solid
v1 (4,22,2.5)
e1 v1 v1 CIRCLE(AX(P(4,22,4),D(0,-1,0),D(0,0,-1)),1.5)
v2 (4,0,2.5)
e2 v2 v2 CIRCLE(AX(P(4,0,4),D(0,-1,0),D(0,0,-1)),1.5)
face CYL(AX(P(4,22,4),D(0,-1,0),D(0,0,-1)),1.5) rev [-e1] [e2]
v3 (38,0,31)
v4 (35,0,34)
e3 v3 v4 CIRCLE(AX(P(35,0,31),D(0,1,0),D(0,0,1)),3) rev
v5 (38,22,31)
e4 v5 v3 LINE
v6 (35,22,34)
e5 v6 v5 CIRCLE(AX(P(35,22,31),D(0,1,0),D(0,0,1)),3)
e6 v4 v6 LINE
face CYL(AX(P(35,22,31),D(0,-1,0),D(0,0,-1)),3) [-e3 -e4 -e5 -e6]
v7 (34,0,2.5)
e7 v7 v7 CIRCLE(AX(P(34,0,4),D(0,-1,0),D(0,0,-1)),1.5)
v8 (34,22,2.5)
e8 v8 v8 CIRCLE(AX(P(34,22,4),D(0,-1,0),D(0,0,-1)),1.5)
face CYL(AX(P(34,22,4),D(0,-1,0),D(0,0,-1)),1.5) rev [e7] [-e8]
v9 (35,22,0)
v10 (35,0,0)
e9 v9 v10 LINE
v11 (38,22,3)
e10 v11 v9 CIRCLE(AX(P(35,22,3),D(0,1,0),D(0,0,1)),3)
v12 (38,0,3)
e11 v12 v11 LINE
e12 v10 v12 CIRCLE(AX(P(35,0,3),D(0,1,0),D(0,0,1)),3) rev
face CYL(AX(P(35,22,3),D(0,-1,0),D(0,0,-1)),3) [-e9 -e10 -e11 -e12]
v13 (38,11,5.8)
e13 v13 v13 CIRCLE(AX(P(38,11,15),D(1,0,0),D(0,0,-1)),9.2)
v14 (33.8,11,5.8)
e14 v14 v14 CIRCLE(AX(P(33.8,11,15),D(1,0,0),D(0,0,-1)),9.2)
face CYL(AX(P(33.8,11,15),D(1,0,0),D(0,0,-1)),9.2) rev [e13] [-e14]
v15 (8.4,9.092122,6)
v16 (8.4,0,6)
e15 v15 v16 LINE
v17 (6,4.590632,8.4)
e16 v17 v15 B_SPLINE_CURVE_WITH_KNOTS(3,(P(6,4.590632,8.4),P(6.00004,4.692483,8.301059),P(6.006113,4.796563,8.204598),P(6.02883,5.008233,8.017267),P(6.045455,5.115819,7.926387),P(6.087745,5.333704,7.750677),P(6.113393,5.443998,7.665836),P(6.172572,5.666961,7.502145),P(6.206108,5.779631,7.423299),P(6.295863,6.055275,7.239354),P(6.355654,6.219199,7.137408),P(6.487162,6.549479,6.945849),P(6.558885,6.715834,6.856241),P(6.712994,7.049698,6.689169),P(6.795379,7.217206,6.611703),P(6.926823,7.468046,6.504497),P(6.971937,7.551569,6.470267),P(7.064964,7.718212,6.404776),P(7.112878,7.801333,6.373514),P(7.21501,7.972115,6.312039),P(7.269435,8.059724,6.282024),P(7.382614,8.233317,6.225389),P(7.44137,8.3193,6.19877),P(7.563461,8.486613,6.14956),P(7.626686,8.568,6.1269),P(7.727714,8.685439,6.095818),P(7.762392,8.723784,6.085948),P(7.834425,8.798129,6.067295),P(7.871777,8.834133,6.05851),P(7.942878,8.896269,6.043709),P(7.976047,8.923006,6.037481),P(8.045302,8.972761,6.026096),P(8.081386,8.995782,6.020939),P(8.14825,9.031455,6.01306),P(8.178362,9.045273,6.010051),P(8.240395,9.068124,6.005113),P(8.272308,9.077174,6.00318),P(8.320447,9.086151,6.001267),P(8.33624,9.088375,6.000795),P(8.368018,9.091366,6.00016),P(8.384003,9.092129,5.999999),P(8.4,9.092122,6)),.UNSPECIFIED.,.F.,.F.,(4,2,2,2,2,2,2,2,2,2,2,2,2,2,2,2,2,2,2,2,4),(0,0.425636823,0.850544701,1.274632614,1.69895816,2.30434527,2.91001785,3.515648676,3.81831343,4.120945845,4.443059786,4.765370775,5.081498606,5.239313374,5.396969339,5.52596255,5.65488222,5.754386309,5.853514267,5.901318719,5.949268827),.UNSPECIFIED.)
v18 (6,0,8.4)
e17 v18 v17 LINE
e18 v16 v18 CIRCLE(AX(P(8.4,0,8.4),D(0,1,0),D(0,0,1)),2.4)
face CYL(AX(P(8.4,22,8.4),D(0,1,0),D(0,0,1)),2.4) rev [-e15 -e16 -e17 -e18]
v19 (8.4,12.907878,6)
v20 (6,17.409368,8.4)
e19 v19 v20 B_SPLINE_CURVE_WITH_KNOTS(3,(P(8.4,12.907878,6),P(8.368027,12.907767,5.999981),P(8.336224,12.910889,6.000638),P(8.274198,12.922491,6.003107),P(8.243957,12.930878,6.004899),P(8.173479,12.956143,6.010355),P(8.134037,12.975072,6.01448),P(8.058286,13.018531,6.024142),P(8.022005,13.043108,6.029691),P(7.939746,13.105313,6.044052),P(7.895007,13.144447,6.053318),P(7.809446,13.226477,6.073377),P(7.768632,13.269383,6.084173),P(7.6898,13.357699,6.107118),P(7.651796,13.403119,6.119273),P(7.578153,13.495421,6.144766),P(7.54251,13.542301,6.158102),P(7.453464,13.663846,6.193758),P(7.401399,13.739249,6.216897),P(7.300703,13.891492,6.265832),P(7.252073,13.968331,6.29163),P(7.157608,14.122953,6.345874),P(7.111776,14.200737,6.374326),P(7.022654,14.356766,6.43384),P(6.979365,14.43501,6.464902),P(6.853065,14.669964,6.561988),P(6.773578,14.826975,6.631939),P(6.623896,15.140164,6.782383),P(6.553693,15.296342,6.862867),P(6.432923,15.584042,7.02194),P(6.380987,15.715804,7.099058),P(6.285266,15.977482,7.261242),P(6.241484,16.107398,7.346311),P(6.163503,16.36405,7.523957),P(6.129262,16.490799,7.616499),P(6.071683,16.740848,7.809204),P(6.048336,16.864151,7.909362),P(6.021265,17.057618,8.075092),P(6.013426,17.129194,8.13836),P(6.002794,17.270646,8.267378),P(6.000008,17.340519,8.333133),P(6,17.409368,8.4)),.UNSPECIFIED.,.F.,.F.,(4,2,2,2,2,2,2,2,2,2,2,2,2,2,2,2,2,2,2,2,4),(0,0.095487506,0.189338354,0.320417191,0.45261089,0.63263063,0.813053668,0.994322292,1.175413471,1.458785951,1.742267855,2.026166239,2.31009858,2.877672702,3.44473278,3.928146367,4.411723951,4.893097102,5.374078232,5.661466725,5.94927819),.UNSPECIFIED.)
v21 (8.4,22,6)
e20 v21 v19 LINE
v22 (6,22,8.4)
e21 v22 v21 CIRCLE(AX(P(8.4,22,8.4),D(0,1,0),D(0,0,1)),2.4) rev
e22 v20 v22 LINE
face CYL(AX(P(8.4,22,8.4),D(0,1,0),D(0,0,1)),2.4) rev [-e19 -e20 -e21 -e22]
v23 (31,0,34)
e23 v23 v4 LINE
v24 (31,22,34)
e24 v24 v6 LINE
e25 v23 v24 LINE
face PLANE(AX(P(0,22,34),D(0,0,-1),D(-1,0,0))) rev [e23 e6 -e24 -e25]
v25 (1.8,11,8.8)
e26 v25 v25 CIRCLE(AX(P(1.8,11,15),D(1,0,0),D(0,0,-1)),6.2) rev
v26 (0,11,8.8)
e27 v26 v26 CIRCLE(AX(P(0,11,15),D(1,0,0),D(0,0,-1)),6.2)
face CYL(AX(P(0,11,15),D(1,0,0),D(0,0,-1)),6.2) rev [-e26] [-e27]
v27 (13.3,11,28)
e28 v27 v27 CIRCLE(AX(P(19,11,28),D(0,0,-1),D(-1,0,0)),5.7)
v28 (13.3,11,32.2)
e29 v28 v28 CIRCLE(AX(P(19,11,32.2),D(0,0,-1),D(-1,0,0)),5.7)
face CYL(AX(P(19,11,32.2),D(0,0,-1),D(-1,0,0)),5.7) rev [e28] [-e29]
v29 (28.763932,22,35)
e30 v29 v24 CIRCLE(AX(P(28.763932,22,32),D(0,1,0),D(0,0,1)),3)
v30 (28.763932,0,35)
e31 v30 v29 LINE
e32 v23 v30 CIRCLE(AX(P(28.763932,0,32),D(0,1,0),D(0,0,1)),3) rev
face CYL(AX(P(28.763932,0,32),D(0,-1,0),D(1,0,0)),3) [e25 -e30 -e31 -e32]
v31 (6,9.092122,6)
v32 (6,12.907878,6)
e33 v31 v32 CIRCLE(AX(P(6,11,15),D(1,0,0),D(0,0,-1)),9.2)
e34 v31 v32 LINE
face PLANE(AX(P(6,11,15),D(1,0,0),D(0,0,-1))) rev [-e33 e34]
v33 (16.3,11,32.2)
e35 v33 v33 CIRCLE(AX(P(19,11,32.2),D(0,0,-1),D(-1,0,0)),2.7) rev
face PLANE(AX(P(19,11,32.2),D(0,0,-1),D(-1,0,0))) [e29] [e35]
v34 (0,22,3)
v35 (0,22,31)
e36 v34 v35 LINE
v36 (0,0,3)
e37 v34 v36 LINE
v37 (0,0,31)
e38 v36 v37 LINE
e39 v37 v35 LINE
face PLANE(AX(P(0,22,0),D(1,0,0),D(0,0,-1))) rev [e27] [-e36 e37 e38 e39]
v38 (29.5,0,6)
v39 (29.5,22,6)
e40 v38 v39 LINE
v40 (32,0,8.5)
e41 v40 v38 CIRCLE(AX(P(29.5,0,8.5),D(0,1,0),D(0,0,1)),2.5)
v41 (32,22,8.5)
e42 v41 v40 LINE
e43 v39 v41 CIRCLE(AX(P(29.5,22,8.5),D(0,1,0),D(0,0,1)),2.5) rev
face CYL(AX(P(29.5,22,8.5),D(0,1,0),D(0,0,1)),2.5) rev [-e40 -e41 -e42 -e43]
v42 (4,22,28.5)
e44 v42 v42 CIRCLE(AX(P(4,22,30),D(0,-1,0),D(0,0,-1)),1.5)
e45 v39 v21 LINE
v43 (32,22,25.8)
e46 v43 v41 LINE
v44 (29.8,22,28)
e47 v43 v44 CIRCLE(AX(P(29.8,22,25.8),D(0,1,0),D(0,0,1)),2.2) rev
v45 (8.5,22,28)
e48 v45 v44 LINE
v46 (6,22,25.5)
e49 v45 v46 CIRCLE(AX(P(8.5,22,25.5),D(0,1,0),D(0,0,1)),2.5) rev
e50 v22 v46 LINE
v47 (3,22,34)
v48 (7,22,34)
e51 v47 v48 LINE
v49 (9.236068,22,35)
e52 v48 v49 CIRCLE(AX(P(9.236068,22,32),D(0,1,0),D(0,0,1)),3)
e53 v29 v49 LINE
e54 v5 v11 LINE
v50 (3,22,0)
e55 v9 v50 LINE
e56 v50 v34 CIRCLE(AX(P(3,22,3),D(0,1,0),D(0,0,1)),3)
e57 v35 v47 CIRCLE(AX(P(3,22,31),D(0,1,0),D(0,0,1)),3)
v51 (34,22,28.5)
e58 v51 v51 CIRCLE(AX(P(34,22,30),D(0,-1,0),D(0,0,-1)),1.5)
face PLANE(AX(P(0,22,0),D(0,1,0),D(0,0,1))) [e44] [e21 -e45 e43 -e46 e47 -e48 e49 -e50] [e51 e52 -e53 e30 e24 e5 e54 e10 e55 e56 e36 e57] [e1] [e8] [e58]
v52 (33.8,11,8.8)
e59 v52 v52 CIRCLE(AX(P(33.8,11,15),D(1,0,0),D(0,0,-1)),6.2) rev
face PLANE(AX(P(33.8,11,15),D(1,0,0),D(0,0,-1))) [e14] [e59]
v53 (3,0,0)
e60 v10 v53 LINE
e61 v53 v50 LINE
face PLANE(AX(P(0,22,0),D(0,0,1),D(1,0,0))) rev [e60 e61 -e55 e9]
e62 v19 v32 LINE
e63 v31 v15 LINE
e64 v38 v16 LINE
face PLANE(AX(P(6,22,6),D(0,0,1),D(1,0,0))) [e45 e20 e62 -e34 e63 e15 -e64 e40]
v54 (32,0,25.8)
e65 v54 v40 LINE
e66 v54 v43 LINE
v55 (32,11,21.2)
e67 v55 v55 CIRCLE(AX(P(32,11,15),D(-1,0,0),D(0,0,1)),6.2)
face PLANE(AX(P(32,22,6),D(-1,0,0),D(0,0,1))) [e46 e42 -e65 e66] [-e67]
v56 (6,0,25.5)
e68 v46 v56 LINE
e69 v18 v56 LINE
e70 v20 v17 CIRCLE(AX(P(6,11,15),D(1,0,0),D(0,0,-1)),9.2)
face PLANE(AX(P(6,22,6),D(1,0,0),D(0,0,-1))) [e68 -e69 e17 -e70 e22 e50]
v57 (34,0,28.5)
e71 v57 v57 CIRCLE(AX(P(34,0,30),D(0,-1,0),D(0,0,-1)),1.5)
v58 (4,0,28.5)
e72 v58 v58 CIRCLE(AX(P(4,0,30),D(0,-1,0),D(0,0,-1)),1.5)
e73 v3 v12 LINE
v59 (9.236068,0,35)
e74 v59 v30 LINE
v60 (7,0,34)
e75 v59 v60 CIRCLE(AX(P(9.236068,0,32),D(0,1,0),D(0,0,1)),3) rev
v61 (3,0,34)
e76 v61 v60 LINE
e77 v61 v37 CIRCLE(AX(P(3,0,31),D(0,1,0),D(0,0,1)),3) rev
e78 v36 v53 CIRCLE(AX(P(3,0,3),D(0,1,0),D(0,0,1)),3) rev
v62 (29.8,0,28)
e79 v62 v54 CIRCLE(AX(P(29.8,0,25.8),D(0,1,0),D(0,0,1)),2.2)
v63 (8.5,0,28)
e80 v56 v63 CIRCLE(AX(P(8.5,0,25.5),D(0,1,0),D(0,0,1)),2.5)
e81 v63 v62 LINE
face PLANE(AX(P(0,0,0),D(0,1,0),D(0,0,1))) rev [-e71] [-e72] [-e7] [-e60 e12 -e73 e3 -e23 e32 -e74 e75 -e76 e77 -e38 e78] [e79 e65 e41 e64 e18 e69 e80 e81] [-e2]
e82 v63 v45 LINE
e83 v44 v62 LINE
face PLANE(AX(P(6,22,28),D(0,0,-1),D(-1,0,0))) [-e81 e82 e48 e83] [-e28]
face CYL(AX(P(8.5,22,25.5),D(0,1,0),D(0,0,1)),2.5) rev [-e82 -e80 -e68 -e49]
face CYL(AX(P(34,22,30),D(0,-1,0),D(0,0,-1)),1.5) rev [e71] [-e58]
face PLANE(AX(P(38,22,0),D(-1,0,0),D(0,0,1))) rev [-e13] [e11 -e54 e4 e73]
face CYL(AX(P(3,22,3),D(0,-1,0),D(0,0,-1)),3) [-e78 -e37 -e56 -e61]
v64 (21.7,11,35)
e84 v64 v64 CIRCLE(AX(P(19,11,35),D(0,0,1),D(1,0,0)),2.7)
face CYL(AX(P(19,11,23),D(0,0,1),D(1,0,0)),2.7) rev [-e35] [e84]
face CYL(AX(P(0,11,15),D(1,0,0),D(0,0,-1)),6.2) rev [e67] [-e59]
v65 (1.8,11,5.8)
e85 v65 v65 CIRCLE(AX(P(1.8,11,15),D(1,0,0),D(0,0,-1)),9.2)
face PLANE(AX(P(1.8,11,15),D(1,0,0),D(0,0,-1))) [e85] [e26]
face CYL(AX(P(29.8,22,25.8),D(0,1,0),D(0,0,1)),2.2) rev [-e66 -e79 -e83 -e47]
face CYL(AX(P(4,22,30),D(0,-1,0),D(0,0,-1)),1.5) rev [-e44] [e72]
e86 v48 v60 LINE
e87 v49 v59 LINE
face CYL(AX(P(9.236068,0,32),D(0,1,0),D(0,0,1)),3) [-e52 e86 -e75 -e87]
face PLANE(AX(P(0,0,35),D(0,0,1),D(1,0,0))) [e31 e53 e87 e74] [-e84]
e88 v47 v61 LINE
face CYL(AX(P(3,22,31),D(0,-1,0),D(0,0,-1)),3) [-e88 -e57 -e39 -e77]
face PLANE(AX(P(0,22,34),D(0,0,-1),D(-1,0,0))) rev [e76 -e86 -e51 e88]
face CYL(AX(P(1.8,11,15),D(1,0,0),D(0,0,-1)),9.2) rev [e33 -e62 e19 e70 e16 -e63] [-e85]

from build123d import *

# Parameters (mm, degrees)
SKETCH3_W           = 38
SKETCH3_H           = 34
SKETCH3_W_2         = 26
SKETCH3_H_2         = 22
BOSS_EXTRUDE1_DEPTH = 22
SKETCH4_W           = 24
SKETCH4_H           = 22
BOSS_EXTRUDE2_DEPTH = 1
SKETCH5_R           = 2.7
CUT_EXTRUDE1_DEPTH  = 12
SKETCH7_R           = 5.7
CUT_EXTRUDE3_DEPTH  = 4.2
SKETCH8_R           = 6.2
CUT_EXTRUDE4_DEPTH  = 57.151580565
SKETCH9_R           = 9.2
CUT_EXTRUDE5_DEPTH  = 4.2
SKETCH10_R          = 9.2
CUT_EXTRUDE6_DEPTH  = 4.2
SKETCH15_R          = 1.5
CUT_EXTRUDE7_DEPTH  = 57.151580565
FILLET1_R           = 3
FILLET3_R           = 2.5
FILLET4_R           = 2.2
FILLET5_R           = 2.4


with BuildPart() as part:
    # Sketch3 → Boss-Extrude1 (new body)
    with BuildSketch(Plane(origin=(0, 0, 0), x_dir=(1, 0, 0), z_dir=(0, 1, 0))):
        with Locations((19, -17)):
            Rectangle(SKETCH3_W, SKETCH3_H)
        with Locations((19, -17)):
            Rectangle(SKETCH3_W_2, SKETCH3_H_2, mode=Mode.SUBTRACT)
    extrude(amount=BOSS_EXTRUDE1_DEPTH)

    # Sketch4 → Boss-Extrude2 (add)
    with BuildSketch(Plane.XY.offset(34)):
        with Locations((19, 11)):
            Rectangle(SKETCH4_W, SKETCH4_H)
    extrude(amount=BOSS_EXTRUDE2_DEPTH)

    # Sketch5 → Cut-Extrude1 (cut)
    with BuildSketch(Plane.XY.offset(35)):
        with Locations((19, 11)):
            Circle(SKETCH5_R)
    extrude(amount=-CUT_EXTRUDE1_DEPTH, mode=Mode.SUBTRACT)

    # Sketch7 → Cut-Extrude3 (cut)
    with BuildSketch(Plane(origin=(0, 0, 28), x_dir=(-1, 0, 0), z_dir=(0, 0, -1))):
        with Locations((-19, 11)):
            Circle(SKETCH7_R)
    extrude(amount=-CUT_EXTRUDE3_DEPTH, mode=Mode.SUBTRACT)

    # Sketch8 → Cut-Extrude4 (cut, through all)
    with BuildSketch(Plane(origin=(38, 0, 0), x_dir=(0, 0, -1), z_dir=(1, 0, 0))):
        with Locations((-15, 11)):
            Circle(SKETCH8_R)
    extrude(amount=-CUT_EXTRUDE4_DEPTH, mode=Mode.SUBTRACT)

    # Sketch9 → Cut-Extrude5 (cut)
    with BuildSketch(Plane(origin=(6, 0, 0), x_dir=(0, 0, -1), z_dir=(1, 0, 0))):
        with Locations((-15, 11)):
            Circle(SKETCH9_R)
    extrude(amount=-CUT_EXTRUDE5_DEPTH, mode=Mode.SUBTRACT)

    # Sketch10 → Cut-Extrude6 (cut)
    with BuildSketch(Plane(origin=(38, 0, 0), x_dir=(0, 0, -1), z_dir=(1, 0, 0))):
        with Locations((-15, 11)):
            Circle(SKETCH10_R)
    extrude(amount=-CUT_EXTRUDE6_DEPTH, mode=Mode.SUBTRACT)

    # Sketch15 → Cut-Extrude7 (cut, through all)
    with BuildSketch(Plane(origin=(0, 0, 0), x_dir=(-1, 0, 0), z_dir=(0, -1, 0))):
        with Locations(Location((-4, -30, 0), (0, 0, 90))):
            Circle(SKETCH15_R)
        with Locations(Location((-34, -30, 0), (0, 0, 90))):
            Circle(SKETCH15_R)
        with Locations(Location((-34, -4, 0), (0, 0, 90))):
            Circle(SKETCH15_R)
        with Locations(Location((-4, -4, 0), (0, 0, 90))):
            Circle(SKETCH15_R)
    extrude(amount=-CUT_EXTRUDE7_DEPTH, mode=Mode.SUBTRACT)

    # Fillet1
    # the kernel refuses this fillet: 3 mm, written as the material it takes off along each edge
    with BuildSketch(Plane(origin=(38, -7.5, 0), x_dir=(-1, 0, 0), z_dir=(0, 1, 0)), Plane(origin=(38, -7.5, 34), x_dir=(0, 0, -1), z_dir=(0, 1, 0))) as fillet1_piece_1:
        with BuildLine():
            CenterArc((FILLET1_R, FILLET1_R), FILLET1_R, 180, 90)
            Line((0, FILLET1_R), (-FILLET1_R * 0.02, FILLET1_R))
            Line((-FILLET1_R * 0.02, FILLET1_R), (-FILLET1_R * 0.02, -FILLET1_R * 0.02))
            Line((-FILLET1_R * 0.02, -FILLET1_R * 0.02), (FILLET1_R, -FILLET1_R * 0.02))
            Line((FILLET1_R, -FILLET1_R * 0.02), (FILLET1_R, 0))
        make_face()
    extrude(amount=37, mode=Mode.SUBTRACT)
    with BuildSketch(Plane(origin=(7, -5.590169944, 35), x_dir=(0, 0, -1), z_dir=(0, 1, 0)), Plane(origin=(31, 27.590169944, 35), x_dir=(0, 0, -1), z_dir=(0, -1, 0))) as fillet1_piece_2:
        with BuildLine():
            CenterArc((3, -2.236067977), FILLET1_R, 131.810314896, 48.189685104)
            Line((0, -2.236067977), (-0.06, -2.236067977))
            Line((-0.06, -2.236067977), (-0.06, 0))
            Line((-0.06, 0), (0, 0.06))
            ThreePointArc((0, 0.06), (0.5, 0.06), (0.96, 0.04472136))
            Line((0.96, 0.04472136), (1, 0))
        make_face()
    extrude(amount=33.180339887, mode=Mode.SUBTRACT)
    with BuildSketch(Plane(origin=(0, -7.5, 34), x_dir=(0, 0, -1), z_dir=(0, 1, 0)), Plane(origin=(0, -7.5, 0), x_dir=(1, 0, 0), z_dir=(0, 1, 0))) as fillet1_piece_3:
        with BuildLine():
            CenterArc((FILLET1_R, -FILLET1_R), FILLET1_R, 90, 90)
            Line((0, -FILLET1_R), (-FILLET1_R * 0.02, -FILLET1_R))
            Line((-FILLET1_R * 0.02, -FILLET1_R), (-FILLET1_R * 0.02, FILLET1_R * 0.02))
            Line((-FILLET1_R * 0.02, FILLET1_R * 0.02), (FILLET1_R, FILLET1_R * 0.02))
            Line((FILLET1_R, FILLET1_R * 0.02), (FILLET1_R, 0))
        make_face()
    extrude(amount=37, mode=Mode.SUBTRACT)

    # Fillet3
    fillet3_edges = [part.edges().sort_by_distance(p)[0] for p in [
        (6, 11, 28),
        (32, 11, 6),
    ]]
    fillet(fillet3_edges, radius=FILLET3_R)

    # Fillet4
    fillet4_edges = [part.edges().sort_by_distance(p)[0] for p in [
        (32, 11, 28),
    ]]
    fillet(fillet4_edges, radius=FILLET4_R)

    # Fillet5
    # the kernel refuses this fillet: 2.4 mm, written as the material it adds along each edge
    with BuildSketch(Plane(origin=(6, 6.907878403, 6), x_dir=(0, 0, 1), z_dir=(0, 1, 0))) as fillet5_piece_1_section:
        with BuildLine():
            CenterArc((FILLET5_R, FILLET5_R), FILLET5_R, 180, 90)
            Line((0, FILLET5_R), (0, 0))
            Line((0, 0), (FILLET5_R, 0))
        make_face()
    fillet5_piece_1 = extrude(amount=15.092121597, mode=Mode.PRIVATE)
    fillet5_piece_1 = fillet5_piece_1 - Plane(origin=(6.778295216, 11, 15), x_dir=(0, 0, -1), z_dir=(1, 0, 0)) * Cylinder(9.2, 40, mode=Mode.PRIVATE)
    add(fillet5_piece_1)
    with BuildSketch(Plane(origin=(6, 0, 6), x_dir=(0, 0, 1), z_dir=(0, 1, 0))) as fillet5_piece_2_section:
        with BuildLine():
            CenterArc((FILLET5_R, FILLET5_R), FILLET5_R, 180, 90)
            Line((0, FILLET5_R), (0, 0))
            Line((0, 0), (FILLET5_R, 0))
        make_face()
    fillet5_piece_2 = extrude(amount=15.092121597, mode=Mode.PRIVATE)
    fillet5_piece_2 = fillet5_piece_2 - Plane(origin=(6.572967992, 11, 15), x_dir=(0, 0, -1), z_dir=(1, 0, 0)) * Cylinder(9.2, 40, mode=Mode.PRIVATE)
    add(fillet5_piece_2)


solid = part.part
